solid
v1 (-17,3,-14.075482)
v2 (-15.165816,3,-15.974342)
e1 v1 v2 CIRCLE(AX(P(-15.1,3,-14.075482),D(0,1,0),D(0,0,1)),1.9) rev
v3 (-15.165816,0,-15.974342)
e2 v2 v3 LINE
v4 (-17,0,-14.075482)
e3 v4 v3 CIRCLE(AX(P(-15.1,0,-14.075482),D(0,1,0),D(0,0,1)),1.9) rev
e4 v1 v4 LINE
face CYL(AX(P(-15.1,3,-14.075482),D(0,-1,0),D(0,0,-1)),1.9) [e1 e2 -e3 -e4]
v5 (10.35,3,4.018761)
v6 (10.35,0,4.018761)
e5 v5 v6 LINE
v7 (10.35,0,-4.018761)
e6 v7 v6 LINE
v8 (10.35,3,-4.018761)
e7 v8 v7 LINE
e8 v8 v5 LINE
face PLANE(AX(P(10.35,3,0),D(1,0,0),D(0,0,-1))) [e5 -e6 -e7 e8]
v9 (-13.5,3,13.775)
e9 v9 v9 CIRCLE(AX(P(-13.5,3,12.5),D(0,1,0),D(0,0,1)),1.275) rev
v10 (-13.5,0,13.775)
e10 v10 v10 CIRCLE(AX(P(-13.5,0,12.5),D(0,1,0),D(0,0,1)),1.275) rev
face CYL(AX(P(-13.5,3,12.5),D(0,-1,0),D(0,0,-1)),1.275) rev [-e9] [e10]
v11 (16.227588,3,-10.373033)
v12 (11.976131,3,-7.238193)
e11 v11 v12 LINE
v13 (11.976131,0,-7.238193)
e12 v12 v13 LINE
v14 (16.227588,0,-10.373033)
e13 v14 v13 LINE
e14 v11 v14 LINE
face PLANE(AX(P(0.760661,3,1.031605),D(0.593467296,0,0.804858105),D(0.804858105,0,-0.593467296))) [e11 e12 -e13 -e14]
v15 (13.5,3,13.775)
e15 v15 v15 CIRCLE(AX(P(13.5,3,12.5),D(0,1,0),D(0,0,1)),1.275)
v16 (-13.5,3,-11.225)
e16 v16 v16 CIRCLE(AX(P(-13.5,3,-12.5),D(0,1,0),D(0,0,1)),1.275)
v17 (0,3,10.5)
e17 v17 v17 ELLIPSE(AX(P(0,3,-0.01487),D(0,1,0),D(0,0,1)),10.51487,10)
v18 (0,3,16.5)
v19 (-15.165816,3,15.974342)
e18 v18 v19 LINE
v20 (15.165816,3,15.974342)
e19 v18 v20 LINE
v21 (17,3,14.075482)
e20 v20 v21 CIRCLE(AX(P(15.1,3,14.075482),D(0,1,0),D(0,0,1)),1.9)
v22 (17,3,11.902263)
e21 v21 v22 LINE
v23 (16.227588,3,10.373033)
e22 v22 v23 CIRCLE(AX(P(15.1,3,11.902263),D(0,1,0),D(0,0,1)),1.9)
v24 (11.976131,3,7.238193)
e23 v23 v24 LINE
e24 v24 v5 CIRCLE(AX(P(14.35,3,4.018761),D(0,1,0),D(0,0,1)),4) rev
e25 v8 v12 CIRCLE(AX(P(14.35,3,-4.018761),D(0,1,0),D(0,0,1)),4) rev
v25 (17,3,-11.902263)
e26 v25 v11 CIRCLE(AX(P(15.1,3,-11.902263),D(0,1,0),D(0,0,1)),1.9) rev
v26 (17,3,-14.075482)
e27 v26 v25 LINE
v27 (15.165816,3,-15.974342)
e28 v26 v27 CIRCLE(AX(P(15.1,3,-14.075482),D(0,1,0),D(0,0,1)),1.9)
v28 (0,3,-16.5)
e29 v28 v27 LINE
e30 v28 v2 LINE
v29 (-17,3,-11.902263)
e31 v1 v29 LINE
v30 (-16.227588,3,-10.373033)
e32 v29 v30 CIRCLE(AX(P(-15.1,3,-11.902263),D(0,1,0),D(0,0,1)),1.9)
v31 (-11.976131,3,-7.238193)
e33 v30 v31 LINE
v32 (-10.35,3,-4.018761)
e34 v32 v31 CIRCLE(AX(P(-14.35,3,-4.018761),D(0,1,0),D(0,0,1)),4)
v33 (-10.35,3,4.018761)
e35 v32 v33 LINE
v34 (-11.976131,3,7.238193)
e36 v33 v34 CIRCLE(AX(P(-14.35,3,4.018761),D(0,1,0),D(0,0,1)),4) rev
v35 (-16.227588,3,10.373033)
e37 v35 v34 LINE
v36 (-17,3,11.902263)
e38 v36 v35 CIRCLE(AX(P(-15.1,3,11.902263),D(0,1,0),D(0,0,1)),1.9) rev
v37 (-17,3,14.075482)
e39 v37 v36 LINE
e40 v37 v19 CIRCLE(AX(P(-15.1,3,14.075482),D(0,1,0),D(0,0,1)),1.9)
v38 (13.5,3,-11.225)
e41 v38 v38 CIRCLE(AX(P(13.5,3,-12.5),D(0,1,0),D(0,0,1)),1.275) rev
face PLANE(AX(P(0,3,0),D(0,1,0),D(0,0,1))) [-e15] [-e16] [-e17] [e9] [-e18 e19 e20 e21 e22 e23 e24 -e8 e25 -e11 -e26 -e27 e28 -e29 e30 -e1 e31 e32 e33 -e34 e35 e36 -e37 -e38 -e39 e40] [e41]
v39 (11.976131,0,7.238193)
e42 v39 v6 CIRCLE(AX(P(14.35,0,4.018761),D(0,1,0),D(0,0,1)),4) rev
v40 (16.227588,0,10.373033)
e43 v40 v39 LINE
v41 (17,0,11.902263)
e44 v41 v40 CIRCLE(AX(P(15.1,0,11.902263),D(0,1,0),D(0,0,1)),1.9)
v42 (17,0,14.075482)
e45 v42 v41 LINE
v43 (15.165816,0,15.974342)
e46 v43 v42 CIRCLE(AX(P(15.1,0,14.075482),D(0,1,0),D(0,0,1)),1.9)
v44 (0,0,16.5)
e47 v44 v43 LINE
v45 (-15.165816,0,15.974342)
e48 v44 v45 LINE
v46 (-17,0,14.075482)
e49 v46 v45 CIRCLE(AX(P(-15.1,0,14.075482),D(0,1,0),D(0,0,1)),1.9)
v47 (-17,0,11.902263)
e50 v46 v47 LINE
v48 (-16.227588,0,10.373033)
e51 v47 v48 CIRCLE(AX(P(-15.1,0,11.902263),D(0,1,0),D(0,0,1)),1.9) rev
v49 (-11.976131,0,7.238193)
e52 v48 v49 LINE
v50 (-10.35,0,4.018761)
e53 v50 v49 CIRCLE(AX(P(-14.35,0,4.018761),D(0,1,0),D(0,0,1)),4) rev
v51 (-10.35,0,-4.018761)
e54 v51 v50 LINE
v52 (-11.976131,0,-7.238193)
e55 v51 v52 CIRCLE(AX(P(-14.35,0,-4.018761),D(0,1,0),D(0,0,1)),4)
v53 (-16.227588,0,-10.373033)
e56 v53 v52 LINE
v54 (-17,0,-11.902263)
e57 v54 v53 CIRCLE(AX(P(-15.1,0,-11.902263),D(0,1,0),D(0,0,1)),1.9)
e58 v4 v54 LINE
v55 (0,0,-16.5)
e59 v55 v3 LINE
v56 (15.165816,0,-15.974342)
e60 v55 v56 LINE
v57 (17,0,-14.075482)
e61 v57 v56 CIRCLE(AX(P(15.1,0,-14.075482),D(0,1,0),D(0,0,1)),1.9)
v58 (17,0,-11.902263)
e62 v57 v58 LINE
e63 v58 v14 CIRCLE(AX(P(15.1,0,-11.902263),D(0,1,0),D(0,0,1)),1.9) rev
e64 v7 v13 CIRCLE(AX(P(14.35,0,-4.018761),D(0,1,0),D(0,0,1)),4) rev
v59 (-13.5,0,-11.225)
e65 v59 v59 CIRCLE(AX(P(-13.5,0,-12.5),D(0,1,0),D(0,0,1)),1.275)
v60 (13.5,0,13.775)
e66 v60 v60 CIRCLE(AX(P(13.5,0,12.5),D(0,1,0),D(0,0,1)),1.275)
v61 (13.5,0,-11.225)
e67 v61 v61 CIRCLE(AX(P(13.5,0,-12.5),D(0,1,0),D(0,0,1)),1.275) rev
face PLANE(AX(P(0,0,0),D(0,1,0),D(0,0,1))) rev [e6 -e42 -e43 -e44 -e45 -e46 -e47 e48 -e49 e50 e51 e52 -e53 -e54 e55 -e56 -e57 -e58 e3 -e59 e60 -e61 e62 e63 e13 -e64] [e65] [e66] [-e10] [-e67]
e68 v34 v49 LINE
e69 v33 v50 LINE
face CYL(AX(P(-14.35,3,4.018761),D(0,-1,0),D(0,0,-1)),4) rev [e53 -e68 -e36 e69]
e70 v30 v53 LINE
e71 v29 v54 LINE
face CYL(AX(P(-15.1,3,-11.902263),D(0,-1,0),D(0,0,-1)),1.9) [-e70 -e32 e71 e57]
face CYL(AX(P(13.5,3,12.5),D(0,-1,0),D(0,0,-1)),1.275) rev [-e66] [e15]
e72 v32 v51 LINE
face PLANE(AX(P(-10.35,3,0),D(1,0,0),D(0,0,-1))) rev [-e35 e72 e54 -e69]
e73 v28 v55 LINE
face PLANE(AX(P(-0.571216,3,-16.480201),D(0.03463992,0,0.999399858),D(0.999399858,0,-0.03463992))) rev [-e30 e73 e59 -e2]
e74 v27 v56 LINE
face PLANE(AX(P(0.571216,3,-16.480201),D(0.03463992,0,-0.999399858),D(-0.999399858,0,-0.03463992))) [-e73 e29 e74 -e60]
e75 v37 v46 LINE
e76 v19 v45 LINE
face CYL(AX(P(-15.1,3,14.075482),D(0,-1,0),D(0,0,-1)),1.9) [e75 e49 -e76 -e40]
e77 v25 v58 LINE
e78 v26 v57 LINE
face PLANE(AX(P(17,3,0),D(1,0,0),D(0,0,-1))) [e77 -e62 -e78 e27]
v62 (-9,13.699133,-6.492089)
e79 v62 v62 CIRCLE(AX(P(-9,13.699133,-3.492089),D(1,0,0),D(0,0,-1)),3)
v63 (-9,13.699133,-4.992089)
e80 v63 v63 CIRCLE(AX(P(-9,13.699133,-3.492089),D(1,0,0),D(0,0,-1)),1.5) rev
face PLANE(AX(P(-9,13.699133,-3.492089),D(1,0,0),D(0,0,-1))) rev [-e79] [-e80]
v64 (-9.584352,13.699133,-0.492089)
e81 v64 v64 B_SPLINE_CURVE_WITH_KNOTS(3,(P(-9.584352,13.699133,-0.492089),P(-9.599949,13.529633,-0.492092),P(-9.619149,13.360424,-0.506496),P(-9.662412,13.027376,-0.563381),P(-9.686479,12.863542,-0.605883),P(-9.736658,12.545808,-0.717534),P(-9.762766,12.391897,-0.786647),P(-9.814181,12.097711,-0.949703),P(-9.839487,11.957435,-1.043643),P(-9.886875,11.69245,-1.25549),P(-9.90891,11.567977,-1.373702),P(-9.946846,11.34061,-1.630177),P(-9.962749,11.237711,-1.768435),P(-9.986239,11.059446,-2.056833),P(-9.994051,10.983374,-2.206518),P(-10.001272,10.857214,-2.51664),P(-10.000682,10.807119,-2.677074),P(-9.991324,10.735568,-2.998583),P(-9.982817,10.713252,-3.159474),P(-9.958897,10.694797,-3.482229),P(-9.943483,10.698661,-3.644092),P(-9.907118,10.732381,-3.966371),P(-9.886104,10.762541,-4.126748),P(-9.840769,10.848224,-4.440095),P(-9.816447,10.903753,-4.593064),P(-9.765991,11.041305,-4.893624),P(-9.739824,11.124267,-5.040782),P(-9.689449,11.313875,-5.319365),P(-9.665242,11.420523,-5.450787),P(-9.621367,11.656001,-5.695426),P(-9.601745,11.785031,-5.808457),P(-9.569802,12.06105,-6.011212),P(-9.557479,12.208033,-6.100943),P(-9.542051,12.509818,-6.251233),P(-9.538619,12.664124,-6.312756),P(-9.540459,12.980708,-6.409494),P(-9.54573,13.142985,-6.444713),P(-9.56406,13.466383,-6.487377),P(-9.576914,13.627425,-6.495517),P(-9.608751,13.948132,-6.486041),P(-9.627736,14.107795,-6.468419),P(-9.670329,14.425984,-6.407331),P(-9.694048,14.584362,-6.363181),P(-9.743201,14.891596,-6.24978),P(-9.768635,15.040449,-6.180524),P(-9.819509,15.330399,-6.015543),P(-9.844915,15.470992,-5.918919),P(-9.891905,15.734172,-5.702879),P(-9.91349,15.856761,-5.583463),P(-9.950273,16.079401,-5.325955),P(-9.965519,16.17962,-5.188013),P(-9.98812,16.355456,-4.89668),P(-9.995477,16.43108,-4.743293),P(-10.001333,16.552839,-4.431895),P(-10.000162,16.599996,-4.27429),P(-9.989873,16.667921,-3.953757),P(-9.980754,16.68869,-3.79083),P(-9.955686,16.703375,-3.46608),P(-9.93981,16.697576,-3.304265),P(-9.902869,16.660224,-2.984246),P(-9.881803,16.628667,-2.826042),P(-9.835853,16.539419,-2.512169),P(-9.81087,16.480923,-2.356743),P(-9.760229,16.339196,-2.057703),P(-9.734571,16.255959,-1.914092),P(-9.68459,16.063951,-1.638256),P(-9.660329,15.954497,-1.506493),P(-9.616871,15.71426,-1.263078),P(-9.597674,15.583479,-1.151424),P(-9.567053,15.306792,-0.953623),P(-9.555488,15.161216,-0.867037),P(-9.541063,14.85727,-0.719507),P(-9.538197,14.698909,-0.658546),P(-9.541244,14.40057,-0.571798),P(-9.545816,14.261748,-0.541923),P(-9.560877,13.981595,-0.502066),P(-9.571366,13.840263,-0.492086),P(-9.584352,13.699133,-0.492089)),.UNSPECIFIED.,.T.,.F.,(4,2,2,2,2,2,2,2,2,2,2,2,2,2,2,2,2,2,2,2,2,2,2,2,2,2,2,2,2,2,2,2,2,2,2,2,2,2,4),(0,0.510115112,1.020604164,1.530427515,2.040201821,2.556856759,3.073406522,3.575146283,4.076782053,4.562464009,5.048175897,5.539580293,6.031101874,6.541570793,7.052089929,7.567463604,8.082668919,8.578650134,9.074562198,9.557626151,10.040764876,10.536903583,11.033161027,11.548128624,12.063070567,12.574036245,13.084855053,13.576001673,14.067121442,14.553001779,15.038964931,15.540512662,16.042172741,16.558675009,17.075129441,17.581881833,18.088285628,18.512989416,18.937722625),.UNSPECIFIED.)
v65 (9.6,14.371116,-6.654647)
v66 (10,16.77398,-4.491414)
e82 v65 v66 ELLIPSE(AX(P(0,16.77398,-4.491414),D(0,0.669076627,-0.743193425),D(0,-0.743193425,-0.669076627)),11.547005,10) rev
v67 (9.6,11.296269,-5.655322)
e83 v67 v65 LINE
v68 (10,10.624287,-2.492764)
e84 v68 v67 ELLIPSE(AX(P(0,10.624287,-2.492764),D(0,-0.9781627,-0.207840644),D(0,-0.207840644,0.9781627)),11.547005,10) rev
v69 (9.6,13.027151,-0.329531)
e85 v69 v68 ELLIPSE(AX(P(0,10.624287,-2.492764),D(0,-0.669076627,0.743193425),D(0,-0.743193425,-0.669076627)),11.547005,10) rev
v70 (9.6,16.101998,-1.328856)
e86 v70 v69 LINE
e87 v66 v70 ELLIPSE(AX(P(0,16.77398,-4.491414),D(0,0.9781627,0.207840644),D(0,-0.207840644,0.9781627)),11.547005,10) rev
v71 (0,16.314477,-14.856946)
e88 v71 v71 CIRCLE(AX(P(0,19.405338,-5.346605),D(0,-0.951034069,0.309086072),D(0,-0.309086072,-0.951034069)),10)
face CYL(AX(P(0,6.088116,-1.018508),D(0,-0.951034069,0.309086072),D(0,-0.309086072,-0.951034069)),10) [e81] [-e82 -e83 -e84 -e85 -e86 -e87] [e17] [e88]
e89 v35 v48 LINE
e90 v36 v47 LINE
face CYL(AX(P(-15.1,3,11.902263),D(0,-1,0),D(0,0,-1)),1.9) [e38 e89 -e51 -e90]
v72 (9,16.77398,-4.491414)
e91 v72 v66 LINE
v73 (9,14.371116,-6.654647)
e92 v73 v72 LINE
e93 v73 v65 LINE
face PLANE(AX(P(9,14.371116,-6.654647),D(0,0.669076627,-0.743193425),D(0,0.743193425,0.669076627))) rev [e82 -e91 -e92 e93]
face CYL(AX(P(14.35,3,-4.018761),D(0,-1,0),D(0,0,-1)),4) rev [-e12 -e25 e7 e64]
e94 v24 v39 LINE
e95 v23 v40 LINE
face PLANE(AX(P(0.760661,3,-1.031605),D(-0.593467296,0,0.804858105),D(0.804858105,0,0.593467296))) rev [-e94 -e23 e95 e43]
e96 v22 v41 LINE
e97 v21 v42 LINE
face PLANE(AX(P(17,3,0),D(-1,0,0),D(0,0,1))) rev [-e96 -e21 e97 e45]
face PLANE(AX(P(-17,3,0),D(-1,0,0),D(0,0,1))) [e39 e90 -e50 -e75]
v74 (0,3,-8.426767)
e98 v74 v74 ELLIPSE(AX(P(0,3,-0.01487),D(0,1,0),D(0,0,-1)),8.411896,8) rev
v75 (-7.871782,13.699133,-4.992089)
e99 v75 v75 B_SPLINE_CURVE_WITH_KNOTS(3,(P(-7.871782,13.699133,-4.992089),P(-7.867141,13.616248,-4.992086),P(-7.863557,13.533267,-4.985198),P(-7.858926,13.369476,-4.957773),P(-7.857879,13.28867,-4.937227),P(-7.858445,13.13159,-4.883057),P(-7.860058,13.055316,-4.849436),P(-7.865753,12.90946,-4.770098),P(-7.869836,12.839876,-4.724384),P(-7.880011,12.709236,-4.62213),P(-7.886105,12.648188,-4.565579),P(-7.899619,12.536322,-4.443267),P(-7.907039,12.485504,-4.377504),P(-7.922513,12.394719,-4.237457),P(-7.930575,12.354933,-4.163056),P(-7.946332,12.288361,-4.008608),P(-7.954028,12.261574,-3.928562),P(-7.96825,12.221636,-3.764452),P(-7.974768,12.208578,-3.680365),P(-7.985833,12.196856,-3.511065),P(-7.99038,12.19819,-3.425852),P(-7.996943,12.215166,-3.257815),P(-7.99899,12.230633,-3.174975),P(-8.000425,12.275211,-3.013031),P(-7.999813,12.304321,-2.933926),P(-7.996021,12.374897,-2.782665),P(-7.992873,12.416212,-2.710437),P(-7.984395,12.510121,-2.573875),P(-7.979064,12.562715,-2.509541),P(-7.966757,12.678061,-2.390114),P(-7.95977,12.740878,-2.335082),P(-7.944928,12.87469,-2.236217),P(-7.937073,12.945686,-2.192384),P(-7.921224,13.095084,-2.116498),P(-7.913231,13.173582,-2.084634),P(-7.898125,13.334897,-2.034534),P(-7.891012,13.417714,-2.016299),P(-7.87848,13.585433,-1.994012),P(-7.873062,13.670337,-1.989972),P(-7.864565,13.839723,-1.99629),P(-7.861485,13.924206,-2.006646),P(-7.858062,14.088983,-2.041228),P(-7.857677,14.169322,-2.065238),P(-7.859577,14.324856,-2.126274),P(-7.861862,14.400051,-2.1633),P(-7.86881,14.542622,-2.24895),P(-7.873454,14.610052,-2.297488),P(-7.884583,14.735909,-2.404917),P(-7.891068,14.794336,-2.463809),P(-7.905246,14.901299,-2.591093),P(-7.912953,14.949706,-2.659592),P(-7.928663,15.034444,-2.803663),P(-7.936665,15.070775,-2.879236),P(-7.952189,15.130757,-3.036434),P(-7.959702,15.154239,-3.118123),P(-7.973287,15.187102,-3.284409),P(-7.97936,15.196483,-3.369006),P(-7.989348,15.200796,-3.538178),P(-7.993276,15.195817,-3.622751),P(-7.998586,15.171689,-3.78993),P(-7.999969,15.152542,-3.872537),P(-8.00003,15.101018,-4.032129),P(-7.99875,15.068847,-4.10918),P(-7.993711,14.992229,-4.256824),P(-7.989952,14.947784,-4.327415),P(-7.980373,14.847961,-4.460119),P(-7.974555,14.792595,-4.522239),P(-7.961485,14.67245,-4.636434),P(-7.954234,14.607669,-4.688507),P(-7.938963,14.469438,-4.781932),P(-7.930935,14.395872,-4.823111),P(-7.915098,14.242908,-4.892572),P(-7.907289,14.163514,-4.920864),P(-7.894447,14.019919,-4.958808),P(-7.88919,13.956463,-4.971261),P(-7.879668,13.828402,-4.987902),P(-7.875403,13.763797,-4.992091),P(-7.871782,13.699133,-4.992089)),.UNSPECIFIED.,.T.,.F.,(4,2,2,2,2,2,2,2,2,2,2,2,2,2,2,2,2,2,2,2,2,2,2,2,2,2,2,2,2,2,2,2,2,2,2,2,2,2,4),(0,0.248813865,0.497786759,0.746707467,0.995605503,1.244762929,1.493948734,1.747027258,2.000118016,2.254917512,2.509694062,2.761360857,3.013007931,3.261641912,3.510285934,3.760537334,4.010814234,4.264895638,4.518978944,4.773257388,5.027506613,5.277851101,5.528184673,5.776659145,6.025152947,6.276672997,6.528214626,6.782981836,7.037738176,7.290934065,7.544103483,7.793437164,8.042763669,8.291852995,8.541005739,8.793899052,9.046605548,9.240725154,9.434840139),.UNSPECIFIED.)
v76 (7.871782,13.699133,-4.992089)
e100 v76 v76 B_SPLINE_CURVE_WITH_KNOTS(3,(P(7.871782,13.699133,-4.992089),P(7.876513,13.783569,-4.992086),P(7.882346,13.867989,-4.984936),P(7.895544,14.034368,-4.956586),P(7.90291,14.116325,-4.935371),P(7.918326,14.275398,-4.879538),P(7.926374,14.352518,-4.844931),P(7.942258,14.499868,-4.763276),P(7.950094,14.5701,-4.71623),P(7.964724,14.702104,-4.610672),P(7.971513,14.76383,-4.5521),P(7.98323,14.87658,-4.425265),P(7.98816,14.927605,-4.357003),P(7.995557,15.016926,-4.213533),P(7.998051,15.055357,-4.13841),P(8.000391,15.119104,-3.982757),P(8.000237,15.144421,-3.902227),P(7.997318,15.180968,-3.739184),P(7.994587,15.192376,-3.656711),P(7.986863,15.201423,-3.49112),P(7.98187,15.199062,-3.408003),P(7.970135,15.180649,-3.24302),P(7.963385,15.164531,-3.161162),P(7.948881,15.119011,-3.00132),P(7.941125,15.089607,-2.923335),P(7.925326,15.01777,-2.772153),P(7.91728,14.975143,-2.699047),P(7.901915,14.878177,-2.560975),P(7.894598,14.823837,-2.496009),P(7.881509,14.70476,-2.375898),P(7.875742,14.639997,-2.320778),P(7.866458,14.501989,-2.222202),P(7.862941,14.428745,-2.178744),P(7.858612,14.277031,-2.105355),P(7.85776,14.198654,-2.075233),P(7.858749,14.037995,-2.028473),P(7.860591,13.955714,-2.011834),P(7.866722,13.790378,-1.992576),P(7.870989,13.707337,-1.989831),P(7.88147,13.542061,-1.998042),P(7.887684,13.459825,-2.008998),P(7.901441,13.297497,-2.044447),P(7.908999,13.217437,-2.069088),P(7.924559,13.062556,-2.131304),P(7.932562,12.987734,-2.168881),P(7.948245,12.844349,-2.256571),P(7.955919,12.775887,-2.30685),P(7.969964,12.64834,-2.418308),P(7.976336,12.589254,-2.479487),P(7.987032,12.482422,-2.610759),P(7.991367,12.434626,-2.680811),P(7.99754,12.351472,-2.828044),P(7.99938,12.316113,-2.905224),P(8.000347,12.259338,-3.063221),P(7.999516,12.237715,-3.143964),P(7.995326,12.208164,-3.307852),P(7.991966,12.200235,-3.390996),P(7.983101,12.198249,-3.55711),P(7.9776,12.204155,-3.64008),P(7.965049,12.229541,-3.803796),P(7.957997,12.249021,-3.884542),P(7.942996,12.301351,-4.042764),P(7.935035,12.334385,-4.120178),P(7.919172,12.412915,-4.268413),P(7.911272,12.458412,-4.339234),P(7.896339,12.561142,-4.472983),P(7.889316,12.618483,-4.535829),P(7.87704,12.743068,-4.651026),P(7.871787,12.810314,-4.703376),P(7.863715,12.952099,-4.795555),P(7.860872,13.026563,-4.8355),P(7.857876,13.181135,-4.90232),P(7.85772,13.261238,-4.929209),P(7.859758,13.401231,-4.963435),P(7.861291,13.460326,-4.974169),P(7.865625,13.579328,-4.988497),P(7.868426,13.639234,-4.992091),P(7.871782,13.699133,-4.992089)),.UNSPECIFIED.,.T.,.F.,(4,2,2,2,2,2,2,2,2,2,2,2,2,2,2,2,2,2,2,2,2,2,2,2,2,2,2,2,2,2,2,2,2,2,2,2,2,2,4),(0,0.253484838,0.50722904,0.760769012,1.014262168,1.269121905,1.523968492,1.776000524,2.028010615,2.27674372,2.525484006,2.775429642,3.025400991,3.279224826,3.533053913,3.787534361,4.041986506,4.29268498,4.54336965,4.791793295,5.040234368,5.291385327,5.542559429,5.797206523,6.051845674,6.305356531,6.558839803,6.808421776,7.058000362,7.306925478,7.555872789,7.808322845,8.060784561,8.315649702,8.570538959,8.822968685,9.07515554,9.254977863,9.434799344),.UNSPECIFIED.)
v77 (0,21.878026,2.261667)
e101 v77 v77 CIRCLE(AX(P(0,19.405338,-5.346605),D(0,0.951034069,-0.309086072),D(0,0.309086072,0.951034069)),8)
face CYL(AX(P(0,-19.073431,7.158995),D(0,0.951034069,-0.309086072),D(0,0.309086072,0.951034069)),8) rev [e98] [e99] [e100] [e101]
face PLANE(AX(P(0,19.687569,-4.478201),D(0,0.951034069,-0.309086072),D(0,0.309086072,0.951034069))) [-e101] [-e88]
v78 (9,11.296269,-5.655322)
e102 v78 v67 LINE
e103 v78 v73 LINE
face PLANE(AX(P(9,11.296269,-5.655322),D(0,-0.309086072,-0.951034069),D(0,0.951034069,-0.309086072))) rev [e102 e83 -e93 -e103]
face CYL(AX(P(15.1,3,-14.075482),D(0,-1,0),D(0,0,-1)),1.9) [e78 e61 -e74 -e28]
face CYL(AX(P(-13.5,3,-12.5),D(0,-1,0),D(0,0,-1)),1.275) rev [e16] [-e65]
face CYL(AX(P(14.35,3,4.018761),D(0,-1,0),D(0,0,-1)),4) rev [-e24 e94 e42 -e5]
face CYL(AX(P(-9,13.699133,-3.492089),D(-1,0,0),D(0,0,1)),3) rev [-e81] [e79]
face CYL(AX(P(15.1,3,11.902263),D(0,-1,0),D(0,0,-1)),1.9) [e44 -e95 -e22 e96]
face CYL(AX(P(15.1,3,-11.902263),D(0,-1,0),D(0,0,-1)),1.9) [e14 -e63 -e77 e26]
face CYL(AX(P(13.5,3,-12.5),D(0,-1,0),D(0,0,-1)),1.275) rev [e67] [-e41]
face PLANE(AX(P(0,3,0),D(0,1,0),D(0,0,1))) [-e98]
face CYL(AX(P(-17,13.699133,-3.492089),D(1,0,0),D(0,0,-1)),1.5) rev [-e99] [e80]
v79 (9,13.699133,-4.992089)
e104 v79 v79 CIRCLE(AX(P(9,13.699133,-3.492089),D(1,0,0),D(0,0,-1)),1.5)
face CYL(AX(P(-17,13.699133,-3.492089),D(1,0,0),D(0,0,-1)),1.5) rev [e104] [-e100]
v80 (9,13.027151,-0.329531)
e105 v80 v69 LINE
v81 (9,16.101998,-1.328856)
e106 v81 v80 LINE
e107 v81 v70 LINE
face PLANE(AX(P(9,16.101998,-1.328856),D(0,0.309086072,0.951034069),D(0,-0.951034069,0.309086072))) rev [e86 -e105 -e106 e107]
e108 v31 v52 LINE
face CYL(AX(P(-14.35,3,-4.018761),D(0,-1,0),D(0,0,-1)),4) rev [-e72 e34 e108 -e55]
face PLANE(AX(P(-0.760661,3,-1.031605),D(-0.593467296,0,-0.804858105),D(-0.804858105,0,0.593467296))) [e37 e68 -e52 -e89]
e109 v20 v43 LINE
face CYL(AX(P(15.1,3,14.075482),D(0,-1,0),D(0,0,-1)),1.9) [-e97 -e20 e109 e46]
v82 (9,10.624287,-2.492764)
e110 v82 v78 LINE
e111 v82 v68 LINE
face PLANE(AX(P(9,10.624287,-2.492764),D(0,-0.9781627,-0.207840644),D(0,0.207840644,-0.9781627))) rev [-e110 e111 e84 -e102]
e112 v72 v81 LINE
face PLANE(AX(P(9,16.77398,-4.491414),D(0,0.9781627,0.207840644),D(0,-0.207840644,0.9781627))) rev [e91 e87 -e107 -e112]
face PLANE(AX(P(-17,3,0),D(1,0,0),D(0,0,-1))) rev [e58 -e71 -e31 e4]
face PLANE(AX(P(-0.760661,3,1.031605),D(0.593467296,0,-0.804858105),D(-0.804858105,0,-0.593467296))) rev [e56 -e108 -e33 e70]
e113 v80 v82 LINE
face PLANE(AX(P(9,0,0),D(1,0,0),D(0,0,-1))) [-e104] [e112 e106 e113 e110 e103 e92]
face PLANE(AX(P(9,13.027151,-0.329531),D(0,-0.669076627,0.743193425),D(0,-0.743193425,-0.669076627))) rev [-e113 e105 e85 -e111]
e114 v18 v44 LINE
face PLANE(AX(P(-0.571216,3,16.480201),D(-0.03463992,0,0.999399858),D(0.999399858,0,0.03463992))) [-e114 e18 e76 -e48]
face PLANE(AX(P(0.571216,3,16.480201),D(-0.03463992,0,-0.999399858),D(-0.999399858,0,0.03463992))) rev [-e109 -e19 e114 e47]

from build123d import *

# Parameters (mm, degrees)
SKETCH_1_R               = 1.275
EXTRUDE_1_DEPTH          = 3
SKETCH_1_3_R             = 1.275
CUT_EXTRUDE_2_DEPTH      = 33.670000656
CUT_EXTRUDE_3_REACH      = 42.042
SKETCH_3_R               = 8
CUT_EXTRUDE_4_DEPTH      = 33.670000656
CUT_EXTRUDE_4_DEPTH_BACK = 33.670000656
SKETCH_4_R               = 1.5
CUT_EXTRUDE_START        = 10
SKETCH_4_3_R             = 1.5
CUT_EXTRUDE_6_DEPTH      = 1
CUT_EXTRUDE_START_2      = -10
SKETCH_5_R               = 3
CUT_EXTRUDE_8_DEPTH      = 1


with BuildPart() as part:
    # 草圖1 → 填料-伸長1 (new body)
    with BuildSketch(Plane(origin=(0, 0, 0), x_dir=(1, 0, 0), z_dir=(0, 1, 0))):
        with BuildLine():
            Line((15.165815849, 15.974341877), (0, 16.5))
            Line((0, 16.5), (-15.165815849, 15.974341877))
            ThreePointArc((-15.165815849, 15.974341877), (-16.466574204, 15.395510535), (-17, 14.075482147))
            Line((-17, 14.075482147), (-17, 11.902263032))
            ThreePointArc((-17, 11.902263032), (-16.795938816, 11.045646706), (-16.227587862, 10.373032633))
            Line((-16.227587862, 10.373032633), (-11.976130816, 7.238193459))
            ThreePointArc((-11.976130816, 7.238193459), (-10.779602492, 5.822163833), (-10.35, 4.01876104))
            Line((-10.35, 4.01876104), (-10.35, -4.01876104))
            ThreePointArc((-10.35, -4.01876104), (-10.779602492, -5.822163833), (-11.976130816, -7.238193459))
            Line((-11.976130816, -7.238193459), (-16.227587862, -10.373032633))
            ThreePointArc((-16.227587862, -10.373032633), (-16.795938816, -11.045646706), (-17, -11.902263032))
            Line((-17, -11.902263032), (-17, -14.075482147))
            ThreePointArc((-17, -14.075482147), (-16.466574204, -15.395510535), (-15.165815849, -15.974341877))
            Line((-15.165815849, -15.974341877), (0, -16.5))
            Line((0, -16.5), (15.165815849, -15.974341877))
            ThreePointArc((15.165815849, -15.974341877), (16.466574204, -15.395510535), (17, -14.075482147))
            Line((17, -14.075482147), (17, -11.902263032))
            ThreePointArc((17, -11.902263032), (16.795938816, -11.045646706), (16.227587862, -10.373032633))
            Line((16.227587862, -10.373032633), (11.976130816, -7.238193459))
            ThreePointArc((11.976130816, -7.238193459), (10.779602492, -5.822163833), (10.35, -4.01876104))
            Line((10.35, -4.01876104), (10.35, 4.01876104))
            ThreePointArc((10.35, 4.01876104), (10.779602492, 5.822163833), (11.976130816, 7.238193459))
            Line((11.976130816, 7.238193459), (16.227587862, 10.373032633))
            ThreePointArc((16.227587862, 10.373032633), (16.795938816, 11.045646706), (17, 11.902263032))
            Line((17, 11.902263032), (17, 14.075482147))
            ThreePointArc((17, 14.075482147), (16.466574204, 15.395510535), (15.165815849, 15.974341877))
        make_face()
        with Locations((-13.5, -12.5)):
            Circle(SKETCH_1_R, mode=Mode.SUBTRACT)
        with Locations((13.5, -12.5)):
            Circle(SKETCH_1_R, mode=Mode.SUBTRACT)
        with Locations((-13.5, 12.5)):
            Circle(SKETCH_1_R, mode=Mode.SUBTRACT)
        with Locations((13.5, 12.5)):
            Circle(SKETCH_1_R, mode=Mode.SUBTRACT)
    extrude(amount=EXTRUDE_1_DEPTH)

    # 草圖2 one side → 旋轉1 (revolve)
    with BuildSketch(Plane(origin=(0, 0, 0), x_dir=(0, 0, -1), z_dir=(1, 0, 0))):
        Polygon((5.34660517, 19.405337686), (-4.163735517, 22.496198409), (-10.5, 3), (0.014870422, 3), align=None)
    revolve(axis=Axis((0, 6.088115951, -1.018508107), (0, 0.9510340687309482, -0.3090860723375583)))

    # 草圖1<3> → 除料-伸長2 (cut, through all)
    with BuildSketch(Plane(origin=(0, 0, 0), x_dir=(1, 0, 0), z_dir=(0, 1, 0))):
        with BuildLine():
            Line((15.165815849, 15.974341877), (0, 16.5))
            Line((0, 16.5), (-15.165815849, 15.974341877))
            ThreePointArc((-15.165815849, 15.974341877), (-16.466574204, 15.395510535), (-17, 14.075482147))
            Line((-17, 14.075482147), (-17, 11.902263032))
            ThreePointArc((-17, 11.902263032), (-16.795938816, 11.045646706), (-16.227587862, 10.373032633))
            Line((-16.227587862, 10.373032633), (-11.976130816, 7.238193459))
            ThreePointArc((-11.976130816, 7.238193459), (-10.779602492, 5.822163833), (-10.35, 4.01876104))
            Line((-10.35, 4.01876104), (-10.35, -4.01876104))
            ThreePointArc((-10.35, -4.01876104), (-10.779602492, -5.822163833), (-11.976130816, -7.238193459))
            Line((-11.976130816, -7.238193459), (-16.227587862, -10.373032633))
            ThreePointArc((-16.227587862, -10.373032633), (-16.795938816, -11.045646706), (-17, -11.902263032))
            Line((-17, -11.902263032), (-17, -14.075482147))
            ThreePointArc((-17, -14.075482147), (-16.466574204, -15.395510535), (-15.165815849, -15.974341877))
            Line((-15.165815849, -15.974341877), (0, -16.5))
            Line((0, -16.5), (15.165815849, -15.974341877))
            ThreePointArc((15.165815849, -15.974341877), (16.466574204, -15.395510535), (17, -14.075482147))
            Line((17, -14.075482147), (17, -11.902263032))
            ThreePointArc((17, -11.902263032), (16.795938816, -11.045646706), (16.227587862, -10.373032633))
            Line((16.227587862, -10.373032633), (11.976130816, -7.238193459))
            ThreePointArc((11.976130816, -7.238193459), (10.779602492, -5.822163833), (10.35, -4.01876104))
            Line((10.35, -4.01876104), (10.35, 4.01876104))
            ThreePointArc((10.35, 4.01876104), (10.779602492, 5.822163833), (11.976130816, 7.238193459))
            Line((11.976130816, 7.238193459), (16.227587862, 10.373032633))
            ThreePointArc((16.227587862, 10.373032633), (16.795938816, 11.045646706), (17, 11.902263032))
            Line((17, 11.902263032), (17, 14.075482147))
            ThreePointArc((17, 14.075482147), (16.466574204, 15.395510535), (15.165815849, 15.974341877))
        make_face()
        with Locations((-13.5, -12.5)):
            Circle(SKETCH_1_3_R, mode=Mode.SUBTRACT)
        with Locations((13.5, -12.5)):
            Circle(SKETCH_1_3_R, mode=Mode.SUBTRACT)
        with Locations((-13.5, 12.5)):
            Circle(SKETCH_1_3_R, mode=Mode.SUBTRACT)
        with Locations((13.5, 12.5)):
            Circle(SKETCH_1_3_R, mode=Mode.SUBTRACT)
    extrude(amount=-CUT_EXTRUDE_2_DEPTH, mode=Mode.SUBTRACT)

    # 除料-伸長3: up to this plane
    cut_extrude_3_end = Plane(origin=(0, 3, 0), z_dir=(0, 1, 0))
    # 草圖3 → 除料-伸長3 (cut, up to the surface)
    with BuildSketch(Plane(origin=(0, 19.123106267, -6.215009537), x_dir=(1, 0, 0), z_dir=(0, 0.9510340687309481, -0.30908607233755836)), mode=Mode.PRIVATE) as cut_extrude_3_sk1:
        with Locations((0, -0.913115939)):
            Circle(SKETCH_3_R)
    cut_extrude_3_tool1 = split(extrude(cut_extrude_3_sk1.sketch, amount=-CUT_EXTRUDE_3_REACH, mode=Mode.PRIVATE), bisect_by=cut_extrude_3_end, keep=Keep.BOTH, mode=Mode.PRIVATE)
    add(cut_extrude_3_tool1.solids().sort_by_distance((0, 19.405338, -5.346605))[0], mode=Mode.SUBTRACT)

    # 草圖4 → 除料-伸長4 (cut, two sides: drawn at the far end of the back side and taken through both)
    with BuildSketch(Plane(origin=(0, 0, 0), x_dir=(0, 0, -1), z_dir=(1, 0, 0)).offset(-CUT_EXTRUDE_4_DEPTH_BACK)):
        with Locations((3.492088736, 13.699133273)):
            Circle(SKETCH_4_R)
    extrude(amount=CUT_EXTRUDE_4_DEPTH + CUT_EXTRUDE_4_DEPTH_BACK, mode=Mode.SUBTRACT)

    # 草圖4<3> → 除料-伸長6 (cut)
    with BuildSketch(Plane(origin=(0, 0, 0), x_dir=(0, 0, -1), z_dir=(1, 0, 0)).offset(CUT_EXTRUDE_START)):
        Polygon((4.491413928, 16.773980017), (1.32885594, 16.101997647), (0.329530748, 13.027150904), (2.492763545, 10.62428653), (5.655321533, 11.296268899), (6.654646724, 14.371115642), align=None)
        with Locations((3.492088736, 13.699133273)):
            Circle(SKETCH_4_3_R, mode=Mode.SUBTRACT)
    extrude(amount=-CUT_EXTRUDE_6_DEPTH, mode=Mode.SUBTRACT)

    # 草圖5 → 除料-伸長8 (cut)
    with BuildSketch(Plane(origin=(0, 0, 0), x_dir=(0, 0, -1), z_dir=(1, 0, 0)).offset(CUT_EXTRUDE_START_2)):
        with Locations((3.492088736, 13.699133273)):
            Circle(SKETCH_5_R)
    extrude(amount=CUT_EXTRUDE_8_DEPTH, mode=Mode.SUBTRACT)


solid = part.part
